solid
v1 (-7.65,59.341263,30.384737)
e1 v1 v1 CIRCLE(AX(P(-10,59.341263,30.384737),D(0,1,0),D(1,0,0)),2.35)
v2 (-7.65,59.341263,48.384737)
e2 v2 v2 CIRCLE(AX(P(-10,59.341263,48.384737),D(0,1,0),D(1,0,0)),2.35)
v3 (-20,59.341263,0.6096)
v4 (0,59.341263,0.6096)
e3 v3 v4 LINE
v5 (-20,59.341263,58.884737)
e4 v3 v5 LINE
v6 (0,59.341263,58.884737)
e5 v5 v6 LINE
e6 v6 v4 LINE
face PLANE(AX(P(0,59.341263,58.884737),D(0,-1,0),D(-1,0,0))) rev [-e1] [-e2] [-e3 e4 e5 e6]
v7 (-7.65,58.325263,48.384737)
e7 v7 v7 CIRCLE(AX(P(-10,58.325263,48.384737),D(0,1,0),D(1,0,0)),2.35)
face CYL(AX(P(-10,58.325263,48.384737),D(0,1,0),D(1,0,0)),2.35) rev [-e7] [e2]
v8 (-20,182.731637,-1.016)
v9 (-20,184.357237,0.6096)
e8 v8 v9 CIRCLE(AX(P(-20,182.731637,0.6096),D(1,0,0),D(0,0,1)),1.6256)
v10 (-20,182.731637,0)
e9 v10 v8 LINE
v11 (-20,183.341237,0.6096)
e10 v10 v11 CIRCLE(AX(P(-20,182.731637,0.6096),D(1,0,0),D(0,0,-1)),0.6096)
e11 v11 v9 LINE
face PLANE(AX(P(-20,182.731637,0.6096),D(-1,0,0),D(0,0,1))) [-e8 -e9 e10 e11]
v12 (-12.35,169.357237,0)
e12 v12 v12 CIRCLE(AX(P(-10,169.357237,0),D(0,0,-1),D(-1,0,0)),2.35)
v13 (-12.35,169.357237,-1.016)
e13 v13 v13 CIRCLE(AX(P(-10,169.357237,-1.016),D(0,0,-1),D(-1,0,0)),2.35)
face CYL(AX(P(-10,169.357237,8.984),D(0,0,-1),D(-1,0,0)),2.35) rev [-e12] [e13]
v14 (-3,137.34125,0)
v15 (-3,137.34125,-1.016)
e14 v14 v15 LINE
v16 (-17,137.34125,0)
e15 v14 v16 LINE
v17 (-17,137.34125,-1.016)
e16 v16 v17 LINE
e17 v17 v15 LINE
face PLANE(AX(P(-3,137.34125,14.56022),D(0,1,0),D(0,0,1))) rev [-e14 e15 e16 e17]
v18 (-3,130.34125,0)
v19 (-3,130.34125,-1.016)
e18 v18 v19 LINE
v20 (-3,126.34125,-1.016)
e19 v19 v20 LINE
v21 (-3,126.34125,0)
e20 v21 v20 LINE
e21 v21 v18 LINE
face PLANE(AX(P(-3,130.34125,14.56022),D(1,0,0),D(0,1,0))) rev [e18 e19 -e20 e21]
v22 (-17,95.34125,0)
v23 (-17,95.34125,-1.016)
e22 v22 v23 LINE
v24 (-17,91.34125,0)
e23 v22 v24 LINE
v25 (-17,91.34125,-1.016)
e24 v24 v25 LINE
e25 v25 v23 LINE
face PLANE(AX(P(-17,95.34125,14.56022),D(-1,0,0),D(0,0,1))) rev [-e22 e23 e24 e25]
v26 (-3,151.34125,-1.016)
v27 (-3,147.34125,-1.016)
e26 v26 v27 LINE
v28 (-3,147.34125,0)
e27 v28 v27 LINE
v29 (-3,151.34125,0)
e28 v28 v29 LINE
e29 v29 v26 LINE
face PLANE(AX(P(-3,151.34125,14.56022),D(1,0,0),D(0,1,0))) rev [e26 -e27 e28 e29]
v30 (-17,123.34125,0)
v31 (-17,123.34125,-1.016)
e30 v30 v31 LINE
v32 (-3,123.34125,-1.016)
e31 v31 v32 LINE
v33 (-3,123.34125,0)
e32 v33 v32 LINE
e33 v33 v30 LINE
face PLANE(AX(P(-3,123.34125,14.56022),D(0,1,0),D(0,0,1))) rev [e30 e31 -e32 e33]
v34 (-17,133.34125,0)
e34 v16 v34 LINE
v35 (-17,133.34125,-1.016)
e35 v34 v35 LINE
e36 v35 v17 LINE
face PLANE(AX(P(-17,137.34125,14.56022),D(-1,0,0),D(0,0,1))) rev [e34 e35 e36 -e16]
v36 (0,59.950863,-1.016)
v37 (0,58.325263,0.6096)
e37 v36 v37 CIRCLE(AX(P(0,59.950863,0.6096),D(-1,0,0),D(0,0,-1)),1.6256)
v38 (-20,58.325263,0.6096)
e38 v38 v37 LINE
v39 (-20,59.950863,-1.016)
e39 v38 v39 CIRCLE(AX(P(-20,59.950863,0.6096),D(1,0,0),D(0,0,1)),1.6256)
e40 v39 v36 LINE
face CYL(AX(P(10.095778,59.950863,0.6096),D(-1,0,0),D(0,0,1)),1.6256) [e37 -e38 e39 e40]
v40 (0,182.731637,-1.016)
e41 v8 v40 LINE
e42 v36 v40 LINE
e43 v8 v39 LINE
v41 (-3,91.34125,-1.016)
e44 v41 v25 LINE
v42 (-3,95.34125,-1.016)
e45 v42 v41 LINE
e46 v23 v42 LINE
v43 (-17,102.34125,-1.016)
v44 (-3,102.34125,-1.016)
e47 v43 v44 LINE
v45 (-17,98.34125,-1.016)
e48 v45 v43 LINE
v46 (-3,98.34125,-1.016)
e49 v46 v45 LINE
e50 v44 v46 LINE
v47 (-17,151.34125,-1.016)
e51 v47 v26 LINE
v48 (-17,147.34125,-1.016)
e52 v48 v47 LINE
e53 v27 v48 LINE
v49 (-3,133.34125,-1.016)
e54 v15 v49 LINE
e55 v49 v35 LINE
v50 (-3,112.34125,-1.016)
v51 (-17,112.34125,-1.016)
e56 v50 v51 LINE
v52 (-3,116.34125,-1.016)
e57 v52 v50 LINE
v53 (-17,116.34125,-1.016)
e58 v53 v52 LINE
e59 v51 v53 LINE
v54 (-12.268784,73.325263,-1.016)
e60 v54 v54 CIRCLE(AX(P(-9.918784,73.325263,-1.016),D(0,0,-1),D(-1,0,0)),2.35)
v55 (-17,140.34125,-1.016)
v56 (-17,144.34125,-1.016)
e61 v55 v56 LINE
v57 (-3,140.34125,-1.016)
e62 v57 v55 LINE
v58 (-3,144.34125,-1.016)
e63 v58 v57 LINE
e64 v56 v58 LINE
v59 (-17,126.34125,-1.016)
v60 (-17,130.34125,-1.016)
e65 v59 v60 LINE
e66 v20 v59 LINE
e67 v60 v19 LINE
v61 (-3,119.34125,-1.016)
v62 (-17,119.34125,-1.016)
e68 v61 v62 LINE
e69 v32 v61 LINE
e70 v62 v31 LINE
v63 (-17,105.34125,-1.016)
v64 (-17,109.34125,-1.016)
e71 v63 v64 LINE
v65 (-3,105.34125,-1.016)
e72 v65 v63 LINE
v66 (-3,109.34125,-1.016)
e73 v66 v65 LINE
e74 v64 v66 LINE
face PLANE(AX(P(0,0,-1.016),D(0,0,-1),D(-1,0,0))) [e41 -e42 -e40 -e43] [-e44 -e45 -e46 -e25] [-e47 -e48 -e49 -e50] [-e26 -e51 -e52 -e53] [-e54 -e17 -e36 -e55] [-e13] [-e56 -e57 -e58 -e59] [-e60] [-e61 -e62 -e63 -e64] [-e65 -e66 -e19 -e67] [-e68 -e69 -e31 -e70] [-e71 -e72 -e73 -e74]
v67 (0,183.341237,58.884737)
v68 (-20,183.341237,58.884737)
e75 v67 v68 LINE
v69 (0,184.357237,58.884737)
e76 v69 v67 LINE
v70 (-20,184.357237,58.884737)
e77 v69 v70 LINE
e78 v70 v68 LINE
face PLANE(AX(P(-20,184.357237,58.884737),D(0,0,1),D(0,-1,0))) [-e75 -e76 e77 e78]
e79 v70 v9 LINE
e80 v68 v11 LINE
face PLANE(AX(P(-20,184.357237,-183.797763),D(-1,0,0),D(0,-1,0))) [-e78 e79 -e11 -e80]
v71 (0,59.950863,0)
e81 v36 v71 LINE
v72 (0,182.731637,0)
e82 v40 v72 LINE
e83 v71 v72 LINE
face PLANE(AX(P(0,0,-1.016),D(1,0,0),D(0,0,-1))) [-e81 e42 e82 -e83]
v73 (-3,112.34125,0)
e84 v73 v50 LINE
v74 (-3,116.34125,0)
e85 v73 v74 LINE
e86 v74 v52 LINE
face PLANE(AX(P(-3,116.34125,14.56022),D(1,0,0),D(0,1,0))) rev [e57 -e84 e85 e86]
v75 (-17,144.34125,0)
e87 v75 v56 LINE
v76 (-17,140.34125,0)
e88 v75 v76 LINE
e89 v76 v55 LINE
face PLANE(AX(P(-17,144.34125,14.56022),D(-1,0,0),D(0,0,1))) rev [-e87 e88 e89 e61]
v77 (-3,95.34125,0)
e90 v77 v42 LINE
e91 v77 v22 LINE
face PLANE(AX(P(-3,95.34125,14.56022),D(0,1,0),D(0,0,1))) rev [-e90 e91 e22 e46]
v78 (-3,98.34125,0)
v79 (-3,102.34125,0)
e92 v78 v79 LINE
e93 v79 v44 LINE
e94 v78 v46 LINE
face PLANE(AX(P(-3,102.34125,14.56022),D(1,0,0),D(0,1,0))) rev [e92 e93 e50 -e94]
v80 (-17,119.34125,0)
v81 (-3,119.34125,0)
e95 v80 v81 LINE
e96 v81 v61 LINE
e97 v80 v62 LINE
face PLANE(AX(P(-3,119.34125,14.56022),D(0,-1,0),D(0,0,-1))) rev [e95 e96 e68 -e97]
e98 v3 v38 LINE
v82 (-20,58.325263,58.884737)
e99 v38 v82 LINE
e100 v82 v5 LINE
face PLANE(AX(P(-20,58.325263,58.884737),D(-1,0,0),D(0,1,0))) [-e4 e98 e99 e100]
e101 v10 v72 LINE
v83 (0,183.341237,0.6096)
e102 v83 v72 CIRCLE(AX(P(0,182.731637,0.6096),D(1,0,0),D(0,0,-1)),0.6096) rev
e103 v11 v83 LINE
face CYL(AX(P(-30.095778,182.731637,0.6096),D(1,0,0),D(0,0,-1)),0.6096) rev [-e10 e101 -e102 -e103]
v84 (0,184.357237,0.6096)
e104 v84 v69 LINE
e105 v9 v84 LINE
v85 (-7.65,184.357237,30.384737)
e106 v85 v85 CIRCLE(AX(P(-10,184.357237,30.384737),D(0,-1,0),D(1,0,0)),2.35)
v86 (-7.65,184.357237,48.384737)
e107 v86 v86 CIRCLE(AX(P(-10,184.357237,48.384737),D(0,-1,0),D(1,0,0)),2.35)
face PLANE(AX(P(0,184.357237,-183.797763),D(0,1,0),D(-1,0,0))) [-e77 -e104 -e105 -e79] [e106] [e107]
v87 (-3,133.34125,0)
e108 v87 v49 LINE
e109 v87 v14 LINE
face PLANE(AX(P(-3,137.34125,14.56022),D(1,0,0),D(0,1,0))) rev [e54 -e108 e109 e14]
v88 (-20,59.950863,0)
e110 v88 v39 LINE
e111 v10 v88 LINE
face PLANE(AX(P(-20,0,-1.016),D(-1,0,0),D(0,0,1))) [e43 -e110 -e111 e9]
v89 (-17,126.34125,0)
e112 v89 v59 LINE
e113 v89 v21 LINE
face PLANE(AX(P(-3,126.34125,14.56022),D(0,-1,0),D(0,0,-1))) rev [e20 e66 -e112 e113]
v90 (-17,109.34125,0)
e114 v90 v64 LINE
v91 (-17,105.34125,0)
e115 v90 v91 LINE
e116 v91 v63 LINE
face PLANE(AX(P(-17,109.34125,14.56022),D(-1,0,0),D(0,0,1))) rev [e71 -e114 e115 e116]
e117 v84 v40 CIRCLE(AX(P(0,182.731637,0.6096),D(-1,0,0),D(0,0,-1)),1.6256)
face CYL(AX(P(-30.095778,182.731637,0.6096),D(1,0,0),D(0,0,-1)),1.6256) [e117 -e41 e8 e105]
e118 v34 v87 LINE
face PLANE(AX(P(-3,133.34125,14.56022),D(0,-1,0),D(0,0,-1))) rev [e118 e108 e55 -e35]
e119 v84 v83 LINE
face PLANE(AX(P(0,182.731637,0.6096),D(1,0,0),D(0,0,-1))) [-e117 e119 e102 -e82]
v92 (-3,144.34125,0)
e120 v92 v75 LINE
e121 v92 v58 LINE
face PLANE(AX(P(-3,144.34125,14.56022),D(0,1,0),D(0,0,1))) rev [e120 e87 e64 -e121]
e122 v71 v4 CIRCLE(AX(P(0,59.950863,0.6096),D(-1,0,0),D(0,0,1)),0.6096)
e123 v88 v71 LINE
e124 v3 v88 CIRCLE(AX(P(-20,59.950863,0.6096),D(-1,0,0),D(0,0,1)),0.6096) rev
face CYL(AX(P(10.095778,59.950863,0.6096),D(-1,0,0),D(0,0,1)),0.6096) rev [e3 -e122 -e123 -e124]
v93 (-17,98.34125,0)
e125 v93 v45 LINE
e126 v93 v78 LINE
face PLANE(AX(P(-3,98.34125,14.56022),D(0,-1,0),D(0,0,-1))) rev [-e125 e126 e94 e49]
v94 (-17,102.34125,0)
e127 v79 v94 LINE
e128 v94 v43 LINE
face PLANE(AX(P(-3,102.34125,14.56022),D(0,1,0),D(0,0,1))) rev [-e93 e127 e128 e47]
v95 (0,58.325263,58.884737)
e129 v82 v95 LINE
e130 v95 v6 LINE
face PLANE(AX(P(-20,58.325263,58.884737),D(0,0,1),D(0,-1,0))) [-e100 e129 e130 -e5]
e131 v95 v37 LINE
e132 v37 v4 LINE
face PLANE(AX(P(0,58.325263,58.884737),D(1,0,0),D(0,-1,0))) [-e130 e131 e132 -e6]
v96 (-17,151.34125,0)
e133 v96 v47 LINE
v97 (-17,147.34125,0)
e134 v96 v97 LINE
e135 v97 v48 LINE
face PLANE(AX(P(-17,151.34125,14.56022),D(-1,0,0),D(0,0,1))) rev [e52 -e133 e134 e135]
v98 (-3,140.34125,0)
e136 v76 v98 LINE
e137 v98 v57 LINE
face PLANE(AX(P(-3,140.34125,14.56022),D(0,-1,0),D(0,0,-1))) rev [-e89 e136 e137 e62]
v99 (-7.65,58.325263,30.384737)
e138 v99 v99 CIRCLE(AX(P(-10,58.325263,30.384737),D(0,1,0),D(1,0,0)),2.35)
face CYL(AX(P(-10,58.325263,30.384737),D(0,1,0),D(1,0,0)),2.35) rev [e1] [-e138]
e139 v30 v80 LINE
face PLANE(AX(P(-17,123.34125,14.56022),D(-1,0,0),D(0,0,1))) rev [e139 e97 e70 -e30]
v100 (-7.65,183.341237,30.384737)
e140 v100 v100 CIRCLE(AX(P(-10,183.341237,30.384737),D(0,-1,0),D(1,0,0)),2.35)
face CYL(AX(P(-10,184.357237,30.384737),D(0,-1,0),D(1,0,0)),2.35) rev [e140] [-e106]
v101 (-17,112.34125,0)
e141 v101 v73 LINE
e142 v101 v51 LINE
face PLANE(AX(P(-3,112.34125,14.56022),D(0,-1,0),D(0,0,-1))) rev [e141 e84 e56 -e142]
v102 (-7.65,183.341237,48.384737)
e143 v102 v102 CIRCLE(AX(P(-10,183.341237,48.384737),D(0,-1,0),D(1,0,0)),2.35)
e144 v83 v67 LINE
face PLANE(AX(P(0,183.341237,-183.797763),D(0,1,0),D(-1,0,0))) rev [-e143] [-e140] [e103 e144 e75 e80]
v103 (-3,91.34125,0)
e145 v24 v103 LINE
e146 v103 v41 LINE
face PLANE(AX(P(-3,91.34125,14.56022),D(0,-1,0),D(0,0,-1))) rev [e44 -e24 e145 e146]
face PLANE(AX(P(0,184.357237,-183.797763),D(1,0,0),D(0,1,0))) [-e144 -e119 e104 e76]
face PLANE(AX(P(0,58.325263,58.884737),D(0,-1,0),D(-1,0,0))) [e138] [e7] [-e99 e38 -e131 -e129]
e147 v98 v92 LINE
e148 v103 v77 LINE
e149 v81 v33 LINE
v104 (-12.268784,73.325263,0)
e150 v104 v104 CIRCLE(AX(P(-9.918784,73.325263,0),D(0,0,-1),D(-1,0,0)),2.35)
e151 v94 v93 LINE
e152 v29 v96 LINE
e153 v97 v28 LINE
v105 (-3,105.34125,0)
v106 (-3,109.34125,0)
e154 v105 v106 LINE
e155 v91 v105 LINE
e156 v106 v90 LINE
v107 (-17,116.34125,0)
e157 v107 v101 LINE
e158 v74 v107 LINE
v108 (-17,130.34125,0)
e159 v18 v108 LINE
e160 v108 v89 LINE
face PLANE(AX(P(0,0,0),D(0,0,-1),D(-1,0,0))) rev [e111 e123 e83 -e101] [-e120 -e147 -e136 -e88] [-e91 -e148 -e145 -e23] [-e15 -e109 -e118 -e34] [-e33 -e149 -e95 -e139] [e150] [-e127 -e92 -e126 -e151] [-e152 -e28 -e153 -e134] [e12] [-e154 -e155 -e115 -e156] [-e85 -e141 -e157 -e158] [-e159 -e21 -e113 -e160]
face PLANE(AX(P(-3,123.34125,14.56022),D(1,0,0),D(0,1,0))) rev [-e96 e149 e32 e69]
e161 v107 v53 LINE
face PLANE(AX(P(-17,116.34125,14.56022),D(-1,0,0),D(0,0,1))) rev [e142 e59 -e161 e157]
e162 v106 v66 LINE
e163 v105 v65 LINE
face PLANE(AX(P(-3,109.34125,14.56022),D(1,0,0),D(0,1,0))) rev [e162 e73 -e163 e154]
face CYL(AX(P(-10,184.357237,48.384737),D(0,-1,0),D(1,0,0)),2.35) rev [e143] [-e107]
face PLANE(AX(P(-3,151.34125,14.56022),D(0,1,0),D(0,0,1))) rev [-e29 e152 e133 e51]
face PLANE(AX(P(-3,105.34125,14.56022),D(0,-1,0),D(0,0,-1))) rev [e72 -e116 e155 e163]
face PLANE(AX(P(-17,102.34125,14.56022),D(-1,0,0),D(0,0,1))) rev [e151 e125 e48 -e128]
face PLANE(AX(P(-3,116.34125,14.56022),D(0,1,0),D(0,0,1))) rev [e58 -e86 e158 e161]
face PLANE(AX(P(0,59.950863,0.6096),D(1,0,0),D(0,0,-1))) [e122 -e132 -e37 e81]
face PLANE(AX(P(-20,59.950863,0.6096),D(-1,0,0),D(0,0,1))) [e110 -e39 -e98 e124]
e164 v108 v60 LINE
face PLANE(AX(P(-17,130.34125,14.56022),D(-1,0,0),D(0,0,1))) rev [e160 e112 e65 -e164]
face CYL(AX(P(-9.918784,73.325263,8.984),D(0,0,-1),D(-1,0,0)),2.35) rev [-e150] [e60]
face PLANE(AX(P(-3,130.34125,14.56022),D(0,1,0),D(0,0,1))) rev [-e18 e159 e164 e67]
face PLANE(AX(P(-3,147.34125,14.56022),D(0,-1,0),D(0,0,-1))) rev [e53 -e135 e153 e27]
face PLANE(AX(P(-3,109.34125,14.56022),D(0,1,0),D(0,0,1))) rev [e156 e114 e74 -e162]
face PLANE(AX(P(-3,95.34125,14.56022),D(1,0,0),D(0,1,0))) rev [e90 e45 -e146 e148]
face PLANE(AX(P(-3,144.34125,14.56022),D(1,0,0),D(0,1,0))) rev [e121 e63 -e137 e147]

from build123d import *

# Parameters (mm, degrees)
SKETCH1_W                  = 20
SKETCH1_H                  = 242.6825
SKETCH1_R                  = 2.35
BASE_FLANGE1_DEPTH         = 1.016
SKETCHED_START             = -20
SKETCHED_BEND1_DEPTH       = 20
SKETCHED_BEND1_2_DEPTH     = 7.6499999
SKETCHED_START_2           = -7.6499999
SKETCHED_BEND1_3_DEPTH     = 7.6499999
SKETCHED_START_3           = -12.3500001
SKETCHED_BEND1_4_DEPTH     = 4.7000002
SKETCHED_START_4           = 58.325262761
SKETCHED_BEND1_5_OUTLINE_R = 2.35
SKETCHED_BEND1_5_DEPTH     = 126.031974478
SKETCH7_R                  = 2.35
CUT_EXTRUDE1_DEPTH         = 10
SKETCH8_W                  = 14
SKETCH8_H                  = 4
CUT_EXTRUDE2_DEPTH         = 1.016


with BuildPart() as part:
    # Base-Flange1: sheet metal written as solids
    # Sketch1 → Base-Flange1 (new body)
    with BuildSketch(Plane.XY):
        with Locations((-10, 121.34125)):
            Rectangle(SKETCH1_W, SKETCH1_H)
        with Locations((-10, 28.5)):
            Circle(SKETCH1_R, mode=Mode.SUBTRACT)
        with Locations((-10, 10.5)):
            Circle(SKETCH1_R, mode=Mode.SUBTRACT)
        with Locations((-10, 232.1825)):
            Circle(SKETCH1_R, mode=Mode.SUBTRACT)
        with Locations((-10, 214.1825)):
            Circle(SKETCH1_R, mode=Mode.SUBTRACT)
    extrude(amount=-BASE_FLANGE1_DEPTH)

    # Sketched Bend1: read off the stored shape, not the designer's step
    # Sketched Bend1 outline → Sketched Bend1 (cut)
    with BuildSketch(Plane.YZ.offset(SKETCHED_START)):
        with BuildLine():
            ThreePointArc((184.238608772, 0), (183.640375265, -0.738276315), (182.731637239, -1.016))
            Line((182.731637239, -1.016), (242.6825, -1.016))
            Line((242.6825, -1.016), (242.6825, 0))
            Line((242.6825, 0), (184.238608772, 0))
        make_face()
        with BuildLine():
            Line((0, -1.016), (59.950862761, -1.016))
            ThreePointArc((59.950862761, -1.016), (59.042124735, -0.738276315), (58.443891228, 0))
            Line((58.443891228, 0), (0, 0))
            Line((0, 0), (0, -1.016))
        make_face()
    extrude(amount=SKETCHED_BEND1_DEPTH, mode=Mode.SUBTRACT)

    # Sketched Bend1 2 outline → Sketched Bend1 2 (add)
    with BuildSketch(Plane.YZ.offset(SKETCHED_START)):
        with BuildLine():
            Line((182.731637239, 0), (184.238608772, 0))
            ThreePointArc((184.238608772, 0), (184.327304542, 0.299082338), (184.357237239, 0.6096))
            Line((184.357237239, 0.6096), (184.357237239, 58.884737239))
            Line((184.357237239, 58.884737239), (183.341237239, 58.884737239))
            Line((183.341237239, 58.884737239), (183.341237239, 0.6096))
            ThreePointArc((183.341237239, 0.6096), (183.162689533, 0.178547706), (182.731637239, 0))
        make_face()
        with BuildLine():
            ThreePointArc((58.325262761, 0.6096), (58.355195458, 0.299082338), (58.443891228, 0))
            Line((58.443891228, 0), (59.950862761, 0))
            ThreePointArc((59.950862761, 0), (59.519810467, 0.178547706), (59.341262761, 0.6096))
            Line((59.341262761, 0.6096), (59.341262761, 58.884737239))
            Line((59.341262761, 58.884737239), (58.325262761, 58.884737239))
            Line((58.325262761, 58.884737239), (58.325262761, 0.6096))
        make_face()
    extrude(amount=SKETCHED_BEND1_2_DEPTH)

    # Sketched Bend1 3 outline → Sketched Bend1 3 (add)
    with BuildSketch(Plane.YZ.offset(SKETCHED_START_2)):
        with BuildLine():
            Line((182.731637239, 0), (184.238608772, 0))
            ThreePointArc((184.238608772, 0), (184.327304542, 0.299082338), (184.357237239, 0.6096))
            Line((184.357237239, 0.6096), (184.357237239, 58.884737239))
            Line((184.357237239, 58.884737239), (183.341237239, 58.884737239))
            Line((183.341237239, 58.884737239), (183.341237239, 0.6096))
            ThreePointArc((183.341237239, 0.6096), (183.162689533, 0.178547706), (182.731637239, 0))
        make_face()
        with BuildLine():
            ThreePointArc((58.325262761, 0.6096), (58.355195458, 0.299082338), (58.443891228, 0))
            Line((58.443891228, 0), (59.950862761, 0))
            ThreePointArc((59.950862761, 0), (59.519810467, 0.178547706), (59.341262761, 0.6096))
            Line((59.341262761, 0.6096), (59.341262761, 58.884737239))
            Line((59.341262761, 58.884737239), (58.325262761, 58.884737239))
            Line((58.325262761, 58.884737239), (58.325262761, 0.6096))
        make_face()
    extrude(amount=SKETCHED_BEND1_3_DEPTH)

    # Sketched Bend1 4 outline → Sketched Bend1 4 (add)
    with BuildSketch(Plane.YZ.offset(SKETCHED_START_3)):
        with BuildLine():
            Line((182.731637239, 0), (184.238608772, 0))
            ThreePointArc((184.238608772, 0), (184.327304542, 0.299082338), (184.357237239, 0.6096))
            Line((184.357237239, 0.6096), (184.357237239, 58.884737239))
            Line((184.357237239, 58.884737239), (183.341237239, 58.884737239))
            Line((183.341237239, 58.884737239), (183.341237239, 0.6096))
            ThreePointArc((183.341237239, 0.6096), (183.162689533, 0.178547706), (182.731637239, 0))
        make_face()
        with BuildLine():
            Line((58.443891228, 0), (59.950862761, 0))
            ThreePointArc((59.950862761, 0), (59.519810467, 0.178547706), (59.341262761, 0.6096))
            Line((59.341262761, 0.6096), (59.341262761, 58.884737239))
            Line((59.341262761, 58.884737239), (58.325262761, 58.884737239))
            Line((58.325262761, 58.884737239), (58.325262761, 0.6096))
            ThreePointArc((58.325262761, 0.6096), (58.355195458, 0.299082338), (58.443891228, 0))
        make_face()
    extrude(amount=SKETCHED_BEND1_4_DEPTH)

    # Sketched Bend1 5 outline → Sketched Bend1 5 (cut)
    with BuildSketch(Plane(origin=(0, 0, 0), x_dir=(1, 0, 0), z_dir=(0, 1, 0)).offset(SKETCHED_START_4)):
        with Locations((-10, -30.384737239)):
            Circle(SKETCHED_BEND1_5_OUTLINE_R)
        with Locations((-10, -48.384737239)):
            Circle(SKETCHED_BEND1_5_OUTLINE_R)
    extrude(amount=SKETCHED_BEND1_5_DEPTH, mode=Mode.SUBTRACT)

    # Sketch7 → Cut-Extrude1 (cut)
    with BuildSketch(Plane(origin=(0, 0, -1.016), x_dir=(-1, 0, 0), z_dir=(0, 0, -1))):
        with Locations((9.918784011, 73.325262761)):
            Circle(SKETCH7_R)
        with Locations((10, 169.357237239)):
            Circle(SKETCH7_R)
    extrude(amount=-CUT_EXTRUDE1_DEPTH, mode=Mode.SUBTRACT)

    # Sketch8 → Cut-Extrude2 (cut)
    with BuildSketch(Plane(origin=(0, 0, -1.016), x_dir=(-1, 0, 0), z_dir=(0, 0, -1))):
        with Locations((10, 149.34125)):
            Rectangle(SKETCH8_W, SKETCH8_H)
        with Locations((10, 142.34125)):
            Rectangle(SKETCH8_W, SKETCH8_H)
        with Locations((10, 135.34125)):
            Rectangle(SKETCH8_W, SKETCH8_H)
        with Locations((10, 128.34125)):
            Rectangle(SKETCH8_W, SKETCH8_H)
        with Locations((10, 121.34125)):
            Rectangle(SKETCH8_W, SKETCH8_H)
        with Locations((10, 114.34125)):
            Rectangle(SKETCH8_W, SKETCH8_H)
        with Locations((10, 107.34125)):
            Rectangle(SKETCH8_W, SKETCH8_H)
        with Locations((10, 100.34125)):
            Rectangle(SKETCH8_W, SKETCH8_H)
        with Locations((10, 93.34125)):
            Rectangle(SKETCH8_W, SKETCH8_H)
    extrude(amount=-CUT_EXTRUDE2_DEPTH, mode=Mode.SUBTRACT)


solid = part.part
